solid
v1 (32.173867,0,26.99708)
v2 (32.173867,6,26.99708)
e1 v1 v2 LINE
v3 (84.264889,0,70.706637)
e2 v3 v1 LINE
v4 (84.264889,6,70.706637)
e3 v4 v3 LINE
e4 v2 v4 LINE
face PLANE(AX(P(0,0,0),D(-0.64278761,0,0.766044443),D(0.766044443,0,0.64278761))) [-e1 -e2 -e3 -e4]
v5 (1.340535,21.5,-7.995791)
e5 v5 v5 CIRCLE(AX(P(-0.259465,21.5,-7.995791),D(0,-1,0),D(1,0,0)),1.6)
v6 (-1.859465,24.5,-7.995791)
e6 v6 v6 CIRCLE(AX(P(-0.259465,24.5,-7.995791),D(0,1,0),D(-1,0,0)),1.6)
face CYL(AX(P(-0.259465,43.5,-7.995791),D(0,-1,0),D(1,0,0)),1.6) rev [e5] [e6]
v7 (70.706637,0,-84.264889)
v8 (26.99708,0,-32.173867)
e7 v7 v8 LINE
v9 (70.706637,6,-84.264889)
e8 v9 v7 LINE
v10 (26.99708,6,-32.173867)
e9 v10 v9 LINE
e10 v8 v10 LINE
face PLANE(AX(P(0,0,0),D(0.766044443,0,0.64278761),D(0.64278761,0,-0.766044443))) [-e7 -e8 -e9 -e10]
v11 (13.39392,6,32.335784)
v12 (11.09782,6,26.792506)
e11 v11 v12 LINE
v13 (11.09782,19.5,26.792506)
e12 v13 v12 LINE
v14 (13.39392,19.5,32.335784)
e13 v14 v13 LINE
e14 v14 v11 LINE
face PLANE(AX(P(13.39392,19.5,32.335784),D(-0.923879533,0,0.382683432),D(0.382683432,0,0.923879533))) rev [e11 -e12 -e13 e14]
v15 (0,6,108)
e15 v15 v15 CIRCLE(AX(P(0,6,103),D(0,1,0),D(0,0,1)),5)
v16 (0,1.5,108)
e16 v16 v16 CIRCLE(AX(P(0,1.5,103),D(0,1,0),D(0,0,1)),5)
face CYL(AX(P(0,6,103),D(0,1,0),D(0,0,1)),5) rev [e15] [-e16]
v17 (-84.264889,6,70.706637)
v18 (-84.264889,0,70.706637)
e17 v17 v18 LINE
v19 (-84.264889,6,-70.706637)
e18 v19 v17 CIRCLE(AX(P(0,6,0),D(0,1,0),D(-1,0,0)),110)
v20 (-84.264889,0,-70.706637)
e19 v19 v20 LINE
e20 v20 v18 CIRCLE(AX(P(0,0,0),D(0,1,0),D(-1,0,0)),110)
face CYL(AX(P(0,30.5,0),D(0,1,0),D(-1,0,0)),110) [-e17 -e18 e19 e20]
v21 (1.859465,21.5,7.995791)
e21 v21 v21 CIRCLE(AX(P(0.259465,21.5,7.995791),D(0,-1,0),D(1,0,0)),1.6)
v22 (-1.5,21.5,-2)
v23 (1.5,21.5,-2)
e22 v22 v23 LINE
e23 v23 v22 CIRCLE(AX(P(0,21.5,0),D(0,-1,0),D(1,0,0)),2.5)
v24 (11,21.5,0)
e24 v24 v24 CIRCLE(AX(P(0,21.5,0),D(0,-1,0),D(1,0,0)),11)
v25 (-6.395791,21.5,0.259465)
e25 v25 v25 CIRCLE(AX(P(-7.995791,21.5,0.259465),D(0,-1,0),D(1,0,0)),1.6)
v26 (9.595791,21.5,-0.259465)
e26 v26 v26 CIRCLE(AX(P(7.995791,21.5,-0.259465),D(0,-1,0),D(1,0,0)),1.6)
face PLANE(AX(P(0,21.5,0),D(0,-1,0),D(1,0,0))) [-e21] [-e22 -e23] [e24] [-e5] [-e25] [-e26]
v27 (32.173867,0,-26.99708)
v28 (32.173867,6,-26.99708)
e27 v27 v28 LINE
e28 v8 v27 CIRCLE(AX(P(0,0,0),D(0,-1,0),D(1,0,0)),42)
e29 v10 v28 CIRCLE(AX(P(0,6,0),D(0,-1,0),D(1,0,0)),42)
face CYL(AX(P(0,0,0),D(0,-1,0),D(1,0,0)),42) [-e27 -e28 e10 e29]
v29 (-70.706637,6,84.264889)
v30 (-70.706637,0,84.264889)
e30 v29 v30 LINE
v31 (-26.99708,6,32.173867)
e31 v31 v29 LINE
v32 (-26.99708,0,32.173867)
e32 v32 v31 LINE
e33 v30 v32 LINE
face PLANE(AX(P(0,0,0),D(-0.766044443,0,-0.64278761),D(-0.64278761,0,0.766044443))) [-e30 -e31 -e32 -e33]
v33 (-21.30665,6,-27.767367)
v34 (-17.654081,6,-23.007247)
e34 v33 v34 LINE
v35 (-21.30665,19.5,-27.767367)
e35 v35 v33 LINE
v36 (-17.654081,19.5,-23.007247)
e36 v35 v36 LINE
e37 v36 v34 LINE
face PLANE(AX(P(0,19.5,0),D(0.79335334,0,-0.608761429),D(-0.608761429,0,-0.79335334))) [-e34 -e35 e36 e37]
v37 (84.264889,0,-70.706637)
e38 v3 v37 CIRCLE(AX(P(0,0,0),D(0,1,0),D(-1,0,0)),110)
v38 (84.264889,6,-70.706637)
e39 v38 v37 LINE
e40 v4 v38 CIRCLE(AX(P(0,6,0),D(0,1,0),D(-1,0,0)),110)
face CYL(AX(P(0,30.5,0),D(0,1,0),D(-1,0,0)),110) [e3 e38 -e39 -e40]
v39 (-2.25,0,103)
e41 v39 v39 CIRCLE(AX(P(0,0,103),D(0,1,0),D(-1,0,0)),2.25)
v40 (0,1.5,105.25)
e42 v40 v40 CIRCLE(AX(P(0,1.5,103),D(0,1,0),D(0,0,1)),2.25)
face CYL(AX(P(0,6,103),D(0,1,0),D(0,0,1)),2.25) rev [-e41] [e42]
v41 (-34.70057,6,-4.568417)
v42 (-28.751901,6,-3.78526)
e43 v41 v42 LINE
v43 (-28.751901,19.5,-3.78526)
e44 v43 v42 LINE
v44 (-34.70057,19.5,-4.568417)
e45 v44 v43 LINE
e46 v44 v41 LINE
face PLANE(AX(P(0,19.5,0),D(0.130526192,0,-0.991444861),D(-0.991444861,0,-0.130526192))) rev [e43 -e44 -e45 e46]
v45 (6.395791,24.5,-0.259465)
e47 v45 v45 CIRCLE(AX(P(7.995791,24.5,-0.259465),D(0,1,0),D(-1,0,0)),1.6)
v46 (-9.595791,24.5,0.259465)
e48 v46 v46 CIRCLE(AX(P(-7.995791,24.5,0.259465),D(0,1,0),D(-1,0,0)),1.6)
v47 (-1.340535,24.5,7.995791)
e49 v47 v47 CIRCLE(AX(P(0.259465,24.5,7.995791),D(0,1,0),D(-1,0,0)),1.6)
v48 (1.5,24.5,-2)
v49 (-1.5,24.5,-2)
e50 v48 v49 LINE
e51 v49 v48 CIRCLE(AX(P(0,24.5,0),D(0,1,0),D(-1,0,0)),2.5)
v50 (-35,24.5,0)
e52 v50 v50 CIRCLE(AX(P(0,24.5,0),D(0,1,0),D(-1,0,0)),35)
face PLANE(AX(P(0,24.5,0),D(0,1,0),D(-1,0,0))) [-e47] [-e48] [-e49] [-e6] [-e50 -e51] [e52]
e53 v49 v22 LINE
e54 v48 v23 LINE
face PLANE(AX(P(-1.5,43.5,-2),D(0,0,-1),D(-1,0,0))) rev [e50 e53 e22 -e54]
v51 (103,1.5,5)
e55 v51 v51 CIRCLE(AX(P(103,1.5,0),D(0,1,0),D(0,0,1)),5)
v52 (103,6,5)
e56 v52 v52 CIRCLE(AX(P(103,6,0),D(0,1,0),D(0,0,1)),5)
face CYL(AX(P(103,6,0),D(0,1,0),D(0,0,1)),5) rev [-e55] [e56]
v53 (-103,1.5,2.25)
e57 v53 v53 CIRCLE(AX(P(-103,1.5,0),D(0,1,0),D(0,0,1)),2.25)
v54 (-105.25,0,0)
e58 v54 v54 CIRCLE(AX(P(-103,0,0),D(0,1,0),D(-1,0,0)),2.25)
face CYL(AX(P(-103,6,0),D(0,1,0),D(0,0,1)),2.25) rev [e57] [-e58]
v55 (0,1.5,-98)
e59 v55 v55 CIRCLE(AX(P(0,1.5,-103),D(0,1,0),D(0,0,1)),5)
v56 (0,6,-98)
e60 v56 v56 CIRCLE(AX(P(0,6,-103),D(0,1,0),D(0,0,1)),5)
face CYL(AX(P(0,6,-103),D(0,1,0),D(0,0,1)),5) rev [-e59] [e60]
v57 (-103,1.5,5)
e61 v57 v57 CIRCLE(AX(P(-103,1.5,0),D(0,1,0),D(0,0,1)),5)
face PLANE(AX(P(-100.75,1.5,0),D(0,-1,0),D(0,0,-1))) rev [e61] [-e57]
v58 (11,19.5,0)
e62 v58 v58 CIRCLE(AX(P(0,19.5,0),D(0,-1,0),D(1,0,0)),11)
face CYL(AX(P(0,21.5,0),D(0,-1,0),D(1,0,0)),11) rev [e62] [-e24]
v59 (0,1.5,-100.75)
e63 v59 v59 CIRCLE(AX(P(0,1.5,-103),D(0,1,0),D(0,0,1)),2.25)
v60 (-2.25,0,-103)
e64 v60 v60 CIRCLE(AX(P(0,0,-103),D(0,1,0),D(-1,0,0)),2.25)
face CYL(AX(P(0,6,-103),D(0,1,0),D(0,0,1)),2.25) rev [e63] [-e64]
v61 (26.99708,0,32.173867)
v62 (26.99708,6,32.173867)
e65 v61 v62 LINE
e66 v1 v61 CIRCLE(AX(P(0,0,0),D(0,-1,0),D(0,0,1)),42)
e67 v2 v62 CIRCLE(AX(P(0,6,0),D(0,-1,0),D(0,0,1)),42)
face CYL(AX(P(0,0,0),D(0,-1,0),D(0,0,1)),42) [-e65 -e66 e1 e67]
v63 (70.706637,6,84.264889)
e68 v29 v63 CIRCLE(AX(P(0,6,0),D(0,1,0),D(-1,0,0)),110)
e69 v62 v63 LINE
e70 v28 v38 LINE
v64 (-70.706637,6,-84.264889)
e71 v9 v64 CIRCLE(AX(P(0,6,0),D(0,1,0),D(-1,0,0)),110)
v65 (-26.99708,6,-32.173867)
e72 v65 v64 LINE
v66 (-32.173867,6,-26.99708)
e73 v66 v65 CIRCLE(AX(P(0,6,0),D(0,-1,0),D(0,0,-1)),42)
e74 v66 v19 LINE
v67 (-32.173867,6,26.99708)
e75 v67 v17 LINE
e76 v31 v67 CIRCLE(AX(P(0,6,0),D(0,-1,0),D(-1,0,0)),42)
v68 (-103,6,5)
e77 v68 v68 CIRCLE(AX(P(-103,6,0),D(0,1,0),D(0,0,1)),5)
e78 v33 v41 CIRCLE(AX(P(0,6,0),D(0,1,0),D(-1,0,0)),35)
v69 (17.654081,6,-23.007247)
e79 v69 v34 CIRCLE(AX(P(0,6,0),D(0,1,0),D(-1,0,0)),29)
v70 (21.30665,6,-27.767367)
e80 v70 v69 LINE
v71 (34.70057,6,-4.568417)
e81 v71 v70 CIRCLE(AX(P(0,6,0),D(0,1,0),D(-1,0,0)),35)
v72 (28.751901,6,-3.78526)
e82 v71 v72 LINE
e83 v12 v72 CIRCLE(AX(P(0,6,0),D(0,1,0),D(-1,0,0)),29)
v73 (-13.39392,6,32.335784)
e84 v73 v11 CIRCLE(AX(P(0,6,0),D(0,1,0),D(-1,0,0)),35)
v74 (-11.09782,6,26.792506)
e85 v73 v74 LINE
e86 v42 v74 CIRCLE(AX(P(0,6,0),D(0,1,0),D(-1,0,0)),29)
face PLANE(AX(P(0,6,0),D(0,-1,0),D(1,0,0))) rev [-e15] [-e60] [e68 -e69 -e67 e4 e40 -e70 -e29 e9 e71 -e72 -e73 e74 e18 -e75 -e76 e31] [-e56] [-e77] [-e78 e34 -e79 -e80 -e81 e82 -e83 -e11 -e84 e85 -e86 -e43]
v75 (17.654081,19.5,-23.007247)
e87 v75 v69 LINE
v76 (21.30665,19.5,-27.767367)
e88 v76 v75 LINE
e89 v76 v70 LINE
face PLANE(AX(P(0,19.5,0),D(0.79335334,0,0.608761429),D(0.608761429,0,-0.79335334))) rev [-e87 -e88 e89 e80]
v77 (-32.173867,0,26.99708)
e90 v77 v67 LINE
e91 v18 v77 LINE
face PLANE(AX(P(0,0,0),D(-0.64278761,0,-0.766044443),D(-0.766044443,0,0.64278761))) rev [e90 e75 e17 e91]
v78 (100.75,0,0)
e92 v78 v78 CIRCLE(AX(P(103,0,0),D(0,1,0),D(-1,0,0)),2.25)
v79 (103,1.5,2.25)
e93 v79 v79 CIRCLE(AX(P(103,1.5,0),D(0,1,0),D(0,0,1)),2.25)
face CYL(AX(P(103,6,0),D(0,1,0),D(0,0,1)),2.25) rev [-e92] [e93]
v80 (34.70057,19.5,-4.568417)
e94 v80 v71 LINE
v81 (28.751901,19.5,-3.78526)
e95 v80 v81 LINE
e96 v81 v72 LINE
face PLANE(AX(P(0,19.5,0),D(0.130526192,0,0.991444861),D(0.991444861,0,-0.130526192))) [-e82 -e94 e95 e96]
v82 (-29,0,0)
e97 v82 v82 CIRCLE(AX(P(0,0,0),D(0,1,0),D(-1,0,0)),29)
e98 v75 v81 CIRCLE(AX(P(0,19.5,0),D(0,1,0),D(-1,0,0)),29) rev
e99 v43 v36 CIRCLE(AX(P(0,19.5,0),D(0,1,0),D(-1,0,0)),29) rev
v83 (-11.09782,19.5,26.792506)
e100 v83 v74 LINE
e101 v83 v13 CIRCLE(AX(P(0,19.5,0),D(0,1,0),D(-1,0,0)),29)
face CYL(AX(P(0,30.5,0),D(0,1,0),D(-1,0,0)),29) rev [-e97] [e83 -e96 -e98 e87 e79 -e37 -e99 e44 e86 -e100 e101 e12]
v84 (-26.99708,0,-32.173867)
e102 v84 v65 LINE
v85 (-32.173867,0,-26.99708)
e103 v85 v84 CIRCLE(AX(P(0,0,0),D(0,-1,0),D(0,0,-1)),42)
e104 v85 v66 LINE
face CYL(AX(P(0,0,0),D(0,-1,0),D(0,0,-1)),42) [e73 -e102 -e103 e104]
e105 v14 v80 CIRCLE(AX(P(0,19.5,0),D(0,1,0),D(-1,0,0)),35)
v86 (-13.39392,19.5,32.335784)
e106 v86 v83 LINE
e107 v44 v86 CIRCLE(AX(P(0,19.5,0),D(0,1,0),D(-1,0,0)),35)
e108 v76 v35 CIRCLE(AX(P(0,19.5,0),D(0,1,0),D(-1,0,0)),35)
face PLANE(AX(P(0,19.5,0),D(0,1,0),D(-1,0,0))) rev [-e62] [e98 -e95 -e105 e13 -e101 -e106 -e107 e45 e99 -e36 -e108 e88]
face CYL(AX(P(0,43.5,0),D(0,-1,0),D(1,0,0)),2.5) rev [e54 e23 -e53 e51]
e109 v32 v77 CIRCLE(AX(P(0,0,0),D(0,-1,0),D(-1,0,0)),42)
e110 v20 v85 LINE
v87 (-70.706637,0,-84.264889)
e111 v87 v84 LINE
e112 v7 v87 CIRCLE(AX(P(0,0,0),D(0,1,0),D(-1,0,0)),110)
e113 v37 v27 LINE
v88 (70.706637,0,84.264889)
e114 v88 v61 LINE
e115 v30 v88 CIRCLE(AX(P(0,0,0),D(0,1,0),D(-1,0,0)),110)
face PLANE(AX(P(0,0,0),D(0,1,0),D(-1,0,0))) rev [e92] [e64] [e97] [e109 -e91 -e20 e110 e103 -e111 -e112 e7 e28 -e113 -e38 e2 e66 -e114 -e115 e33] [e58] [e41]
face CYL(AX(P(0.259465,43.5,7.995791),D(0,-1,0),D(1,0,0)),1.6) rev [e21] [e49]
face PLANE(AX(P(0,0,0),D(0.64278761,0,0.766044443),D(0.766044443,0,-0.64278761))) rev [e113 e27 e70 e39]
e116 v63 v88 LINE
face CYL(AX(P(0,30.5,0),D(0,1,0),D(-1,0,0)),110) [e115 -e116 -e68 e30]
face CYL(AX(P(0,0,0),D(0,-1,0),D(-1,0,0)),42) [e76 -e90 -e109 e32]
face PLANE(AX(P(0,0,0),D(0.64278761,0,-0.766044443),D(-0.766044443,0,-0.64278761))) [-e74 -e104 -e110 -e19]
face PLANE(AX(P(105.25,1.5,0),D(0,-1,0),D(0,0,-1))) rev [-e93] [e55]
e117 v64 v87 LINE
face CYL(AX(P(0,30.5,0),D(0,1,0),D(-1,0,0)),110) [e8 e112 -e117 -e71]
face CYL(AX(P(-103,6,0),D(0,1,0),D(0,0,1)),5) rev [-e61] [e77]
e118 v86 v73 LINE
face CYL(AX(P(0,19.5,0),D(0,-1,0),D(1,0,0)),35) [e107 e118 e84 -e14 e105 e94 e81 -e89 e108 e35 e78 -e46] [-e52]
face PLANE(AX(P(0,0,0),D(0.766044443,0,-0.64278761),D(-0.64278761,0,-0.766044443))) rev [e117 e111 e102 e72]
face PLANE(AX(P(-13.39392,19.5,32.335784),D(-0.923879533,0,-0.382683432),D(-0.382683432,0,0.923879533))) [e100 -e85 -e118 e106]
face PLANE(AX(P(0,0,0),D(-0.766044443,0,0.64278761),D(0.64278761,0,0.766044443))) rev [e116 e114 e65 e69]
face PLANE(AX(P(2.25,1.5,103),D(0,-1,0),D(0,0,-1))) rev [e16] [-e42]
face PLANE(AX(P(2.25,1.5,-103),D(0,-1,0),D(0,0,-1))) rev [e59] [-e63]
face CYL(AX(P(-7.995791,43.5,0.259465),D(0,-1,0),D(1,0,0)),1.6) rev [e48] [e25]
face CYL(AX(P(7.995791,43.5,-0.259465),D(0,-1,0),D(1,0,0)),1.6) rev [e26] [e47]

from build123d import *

# Parameters (mm, degrees)
SCHIZZO1_W                                          = 81
SCHIZZO1_H                                          = 6
ESTRUSIONE_ESTRUSIONE2_START                        = 13.5
ESTRUSIONE_ESTRUSIONE2_DEPTH                        = 13.5
ESTRUSIONE_ESTRUSIONE3_START                        = 5
SCHIZZO4_R                                          = 35
ESTRUSIONE_ESTRUSIONE3_DEPTH                        = 5
TAGLIA_RIVOLUZIONE2_DEPTH                           = 6
RIPETIZIONECIRCOLARE1_COUNT                         = 4
SCHIZZO6_R                                          = 11
TAGLIO_ESTRUSIONE2_DEPTH                            = 2
SCHIZZO7_R                                          = 1.6
TAGLIO_ESTRUSIONE3_DEPTH                            = 22
FORO_LAMATO_PER_VITE_M4_A_TESTA_SOTTILE_D           = 4.5
FORO_LAMATO_PER_VITE_M4_A_TESTA_SOTTILE_DEPTH       = 9
FORO_LAMATO_PER_VITE_M4_A_TESTA_SOTTILE_CBORE_D     = 10
FORO_LAMATO_PER_VITE_M4_A_TESTA_SOTTILE_CBORE_DEPTH = 4.5
FORO_LAMATO_PER_VITE_M4_A_TESTA_SOTTILE_TIP         = 1.351936393


# Read off the part's stored shape, not the designer's step: Taglia-Rivoluzione2
with BuildPart() as part:
    # Schizzo1 → Rivoluzione1 (revolve)
    with BuildSketch(Plane.XY):
        with Locations((-69.5, 3)):
            Rectangle(SCHIZZO1_W, SCHIZZO1_H)
    revolve(axis=Axis((0, 30.5, 0), (0, -1, 0)))

    # Schizzo3 → Estrusione-Estrusione2 (add)
    with BuildSketch(Plane(origin=(0, 6, 0), x_dir=(1, 0, 0), z_dir=(0, 1, 0)).offset(ESTRUSIONE_ESTRUSIONE2_START)):
        with BuildLine():
            Line((21.306650015, 27.76736691), (17.654081441, 23.007246868))
            ThreePointArc((17.654081441, 23.007246868), (25.11473671, 14.5), (28.75190098, 3.785259574))
            Line((28.75190098, 3.785259574), (34.700570148, 4.568416728))
            ThreePointArc((34.700570148, 4.568416728), (30.310889132, 17.5), (21.306650015, 27.76736691))
        make_face()
        with BuildLine():
            ThreePointArc((-21.306650015, 27.76736691), (-30.310889132, 17.5), (-34.700570148, 4.568416728))
            Line((-34.700570148, 4.568416728), (-28.75190098, 3.785259574))
            ThreePointArc((-28.75190098, 3.785259574), (-25.11473671, 14.5), (-17.654081441, 23.007246868))
            Line((-17.654081441, 23.007246868), (-21.306650015, 27.76736691))
        make_face()
        with BuildLine():
            ThreePointArc((-13.393920133, -32.335783638), (0, -35), (13.393920133, -32.335783638))
            Line((13.393920133, -32.335783638), (11.097819539, -26.792506443))
            ThreePointArc((11.097819539, -26.792506443), (0, -29), (-11.097819539, -26.792506443))
            Line((-11.097819539, -26.792506443), (-13.393920133, -32.335783638))
        make_face()
    extrude(amount=-ESTRUSIONE_ESTRUSIONE2_DEPTH)

    # Schizzo4 → Estrusione-Estrusione3 (add)
    with BuildSketch(Plane(origin=(0, 19.5, 0), x_dir=(1, 0, 0), z_dir=(0, 1, 0)).offset(ESTRUSIONE_ESTRUSIONE3_START)):
        with Locations(Location((0, 0, 0), (0, 0, 7.5))):
            Circle(SCHIZZO4_R)
    extrude(amount=-ESTRUSIONE_ESTRUSIONE3_DEPTH)

    # Taglia-Rivoluzione2 outline → Taglia-Rivoluzione2 (cut)
    with BuildSketch(Plane(origin=(0, 0, 0), x_dir=(1, 0, 0), z_dir=(0, 1, 0))):
        with BuildLine():
            Line((-84.264888743, 70.706637066), (-32.173866611, 26.997079607))
            ThreePointArc((-32.173866611, 26.997079607), (-29.69848481, 29.69848481), (-26.997079607, 32.173866611))
            Line((-26.997079607, 32.173866611), (-70.706637066, 84.264888743))
            ThreePointArc((-70.706637066, 84.264888743), (-77.781745931, 77.781745931), (-84.264888743, 70.706637066))
        make_face()
    taglia_rivoluzione2 = extrude(amount=TAGLIA_RIVOLUZIONE2_DEPTH, mode=Mode.SUBTRACT)

    # RipetizioneCircolare1: Taglia-Rivoluzione2 ×4 about axis
    ripetizionecircolare1_axis = Axis((0, 6, 0), (0, 1, 0))
    for i in range(1, RIPETIZIONECIRCOLARE1_COUNT):
        add(taglia_rivoluzione2.rotate(ripetizionecircolare1_axis, i * 360 / RIPETIZIONECIRCOLARE1_COUNT), mode=Mode.SUBTRACT)

    # Schizzo6 → Taglio-Estrusione2 (cut)
    with BuildSketch(Plane.XZ.offset(-19.5)):
        Circle(SCHIZZO6_R)
    extrude(amount=-TAGLIO_ESTRUSIONE2_DEPTH, mode=Mode.SUBTRACT)

    # Schizzo7 → Taglio-Estrusione3 (cut)
    with BuildSketch(Plane.XZ.offset(-21.5)):
        with Locations((-7.995791255, 0.259465219)):
            Circle(SCHIZZO7_R)
        with Locations((0.259465219, 7.995791255)):
            Circle(SCHIZZO7_R)
        with Locations((7.995791255, -0.259465219)):
            Circle(SCHIZZO7_R)
        with Locations((-0.259465219, -7.995791255)):
            Circle(SCHIZZO7_R)
        with BuildLine():
            Line((-1.5, -2), (1.5, -2))
            ThreePointArc((1.5, -2), (0, 2.5), (-1.5, -2))
        make_face()
    extrude(amount=-TAGLIO_ESTRUSIONE3_DEPTH, mode=Mode.SUBTRACT)

    # Foro lamato per Vite M4 a testa sottile cilindrica1
    with Locations(Plane(origin=(0, 6, 0), x_dir=(1, 0, 0), z_dir=(0, 1, 0))):
        with Locations((-103, 0), (103, 0), (0, 103), (0, -103)):
            CounterBoreHole(FORO_LAMATO_PER_VITE_M4_A_TESTA_SOTTILE_D / 2, FORO_LAMATO_PER_VITE_M4_A_TESTA_SOTTILE_CBORE_D / 2, FORO_LAMATO_PER_VITE_M4_A_TESTA_SOTTILE_CBORE_DEPTH, depth=FORO_LAMATO_PER_VITE_M4_A_TESTA_SOTTILE_DEPTH)
            with Locations((0, 0, -(FORO_LAMATO_PER_VITE_M4_A_TESTA_SOTTILE_DEPTH + FORO_LAMATO_PER_VITE_M4_A_TESTA_SOTTILE_TIP / 2))):  # 118° drill point
                Cone(0, FORO_LAMATO_PER_VITE_M4_A_TESTA_SOTTILE_D / 2, FORO_LAMATO_PER_VITE_M4_A_TESTA_SOTTILE_TIP, mode=Mode.SUBTRACT)


solid = part.part
